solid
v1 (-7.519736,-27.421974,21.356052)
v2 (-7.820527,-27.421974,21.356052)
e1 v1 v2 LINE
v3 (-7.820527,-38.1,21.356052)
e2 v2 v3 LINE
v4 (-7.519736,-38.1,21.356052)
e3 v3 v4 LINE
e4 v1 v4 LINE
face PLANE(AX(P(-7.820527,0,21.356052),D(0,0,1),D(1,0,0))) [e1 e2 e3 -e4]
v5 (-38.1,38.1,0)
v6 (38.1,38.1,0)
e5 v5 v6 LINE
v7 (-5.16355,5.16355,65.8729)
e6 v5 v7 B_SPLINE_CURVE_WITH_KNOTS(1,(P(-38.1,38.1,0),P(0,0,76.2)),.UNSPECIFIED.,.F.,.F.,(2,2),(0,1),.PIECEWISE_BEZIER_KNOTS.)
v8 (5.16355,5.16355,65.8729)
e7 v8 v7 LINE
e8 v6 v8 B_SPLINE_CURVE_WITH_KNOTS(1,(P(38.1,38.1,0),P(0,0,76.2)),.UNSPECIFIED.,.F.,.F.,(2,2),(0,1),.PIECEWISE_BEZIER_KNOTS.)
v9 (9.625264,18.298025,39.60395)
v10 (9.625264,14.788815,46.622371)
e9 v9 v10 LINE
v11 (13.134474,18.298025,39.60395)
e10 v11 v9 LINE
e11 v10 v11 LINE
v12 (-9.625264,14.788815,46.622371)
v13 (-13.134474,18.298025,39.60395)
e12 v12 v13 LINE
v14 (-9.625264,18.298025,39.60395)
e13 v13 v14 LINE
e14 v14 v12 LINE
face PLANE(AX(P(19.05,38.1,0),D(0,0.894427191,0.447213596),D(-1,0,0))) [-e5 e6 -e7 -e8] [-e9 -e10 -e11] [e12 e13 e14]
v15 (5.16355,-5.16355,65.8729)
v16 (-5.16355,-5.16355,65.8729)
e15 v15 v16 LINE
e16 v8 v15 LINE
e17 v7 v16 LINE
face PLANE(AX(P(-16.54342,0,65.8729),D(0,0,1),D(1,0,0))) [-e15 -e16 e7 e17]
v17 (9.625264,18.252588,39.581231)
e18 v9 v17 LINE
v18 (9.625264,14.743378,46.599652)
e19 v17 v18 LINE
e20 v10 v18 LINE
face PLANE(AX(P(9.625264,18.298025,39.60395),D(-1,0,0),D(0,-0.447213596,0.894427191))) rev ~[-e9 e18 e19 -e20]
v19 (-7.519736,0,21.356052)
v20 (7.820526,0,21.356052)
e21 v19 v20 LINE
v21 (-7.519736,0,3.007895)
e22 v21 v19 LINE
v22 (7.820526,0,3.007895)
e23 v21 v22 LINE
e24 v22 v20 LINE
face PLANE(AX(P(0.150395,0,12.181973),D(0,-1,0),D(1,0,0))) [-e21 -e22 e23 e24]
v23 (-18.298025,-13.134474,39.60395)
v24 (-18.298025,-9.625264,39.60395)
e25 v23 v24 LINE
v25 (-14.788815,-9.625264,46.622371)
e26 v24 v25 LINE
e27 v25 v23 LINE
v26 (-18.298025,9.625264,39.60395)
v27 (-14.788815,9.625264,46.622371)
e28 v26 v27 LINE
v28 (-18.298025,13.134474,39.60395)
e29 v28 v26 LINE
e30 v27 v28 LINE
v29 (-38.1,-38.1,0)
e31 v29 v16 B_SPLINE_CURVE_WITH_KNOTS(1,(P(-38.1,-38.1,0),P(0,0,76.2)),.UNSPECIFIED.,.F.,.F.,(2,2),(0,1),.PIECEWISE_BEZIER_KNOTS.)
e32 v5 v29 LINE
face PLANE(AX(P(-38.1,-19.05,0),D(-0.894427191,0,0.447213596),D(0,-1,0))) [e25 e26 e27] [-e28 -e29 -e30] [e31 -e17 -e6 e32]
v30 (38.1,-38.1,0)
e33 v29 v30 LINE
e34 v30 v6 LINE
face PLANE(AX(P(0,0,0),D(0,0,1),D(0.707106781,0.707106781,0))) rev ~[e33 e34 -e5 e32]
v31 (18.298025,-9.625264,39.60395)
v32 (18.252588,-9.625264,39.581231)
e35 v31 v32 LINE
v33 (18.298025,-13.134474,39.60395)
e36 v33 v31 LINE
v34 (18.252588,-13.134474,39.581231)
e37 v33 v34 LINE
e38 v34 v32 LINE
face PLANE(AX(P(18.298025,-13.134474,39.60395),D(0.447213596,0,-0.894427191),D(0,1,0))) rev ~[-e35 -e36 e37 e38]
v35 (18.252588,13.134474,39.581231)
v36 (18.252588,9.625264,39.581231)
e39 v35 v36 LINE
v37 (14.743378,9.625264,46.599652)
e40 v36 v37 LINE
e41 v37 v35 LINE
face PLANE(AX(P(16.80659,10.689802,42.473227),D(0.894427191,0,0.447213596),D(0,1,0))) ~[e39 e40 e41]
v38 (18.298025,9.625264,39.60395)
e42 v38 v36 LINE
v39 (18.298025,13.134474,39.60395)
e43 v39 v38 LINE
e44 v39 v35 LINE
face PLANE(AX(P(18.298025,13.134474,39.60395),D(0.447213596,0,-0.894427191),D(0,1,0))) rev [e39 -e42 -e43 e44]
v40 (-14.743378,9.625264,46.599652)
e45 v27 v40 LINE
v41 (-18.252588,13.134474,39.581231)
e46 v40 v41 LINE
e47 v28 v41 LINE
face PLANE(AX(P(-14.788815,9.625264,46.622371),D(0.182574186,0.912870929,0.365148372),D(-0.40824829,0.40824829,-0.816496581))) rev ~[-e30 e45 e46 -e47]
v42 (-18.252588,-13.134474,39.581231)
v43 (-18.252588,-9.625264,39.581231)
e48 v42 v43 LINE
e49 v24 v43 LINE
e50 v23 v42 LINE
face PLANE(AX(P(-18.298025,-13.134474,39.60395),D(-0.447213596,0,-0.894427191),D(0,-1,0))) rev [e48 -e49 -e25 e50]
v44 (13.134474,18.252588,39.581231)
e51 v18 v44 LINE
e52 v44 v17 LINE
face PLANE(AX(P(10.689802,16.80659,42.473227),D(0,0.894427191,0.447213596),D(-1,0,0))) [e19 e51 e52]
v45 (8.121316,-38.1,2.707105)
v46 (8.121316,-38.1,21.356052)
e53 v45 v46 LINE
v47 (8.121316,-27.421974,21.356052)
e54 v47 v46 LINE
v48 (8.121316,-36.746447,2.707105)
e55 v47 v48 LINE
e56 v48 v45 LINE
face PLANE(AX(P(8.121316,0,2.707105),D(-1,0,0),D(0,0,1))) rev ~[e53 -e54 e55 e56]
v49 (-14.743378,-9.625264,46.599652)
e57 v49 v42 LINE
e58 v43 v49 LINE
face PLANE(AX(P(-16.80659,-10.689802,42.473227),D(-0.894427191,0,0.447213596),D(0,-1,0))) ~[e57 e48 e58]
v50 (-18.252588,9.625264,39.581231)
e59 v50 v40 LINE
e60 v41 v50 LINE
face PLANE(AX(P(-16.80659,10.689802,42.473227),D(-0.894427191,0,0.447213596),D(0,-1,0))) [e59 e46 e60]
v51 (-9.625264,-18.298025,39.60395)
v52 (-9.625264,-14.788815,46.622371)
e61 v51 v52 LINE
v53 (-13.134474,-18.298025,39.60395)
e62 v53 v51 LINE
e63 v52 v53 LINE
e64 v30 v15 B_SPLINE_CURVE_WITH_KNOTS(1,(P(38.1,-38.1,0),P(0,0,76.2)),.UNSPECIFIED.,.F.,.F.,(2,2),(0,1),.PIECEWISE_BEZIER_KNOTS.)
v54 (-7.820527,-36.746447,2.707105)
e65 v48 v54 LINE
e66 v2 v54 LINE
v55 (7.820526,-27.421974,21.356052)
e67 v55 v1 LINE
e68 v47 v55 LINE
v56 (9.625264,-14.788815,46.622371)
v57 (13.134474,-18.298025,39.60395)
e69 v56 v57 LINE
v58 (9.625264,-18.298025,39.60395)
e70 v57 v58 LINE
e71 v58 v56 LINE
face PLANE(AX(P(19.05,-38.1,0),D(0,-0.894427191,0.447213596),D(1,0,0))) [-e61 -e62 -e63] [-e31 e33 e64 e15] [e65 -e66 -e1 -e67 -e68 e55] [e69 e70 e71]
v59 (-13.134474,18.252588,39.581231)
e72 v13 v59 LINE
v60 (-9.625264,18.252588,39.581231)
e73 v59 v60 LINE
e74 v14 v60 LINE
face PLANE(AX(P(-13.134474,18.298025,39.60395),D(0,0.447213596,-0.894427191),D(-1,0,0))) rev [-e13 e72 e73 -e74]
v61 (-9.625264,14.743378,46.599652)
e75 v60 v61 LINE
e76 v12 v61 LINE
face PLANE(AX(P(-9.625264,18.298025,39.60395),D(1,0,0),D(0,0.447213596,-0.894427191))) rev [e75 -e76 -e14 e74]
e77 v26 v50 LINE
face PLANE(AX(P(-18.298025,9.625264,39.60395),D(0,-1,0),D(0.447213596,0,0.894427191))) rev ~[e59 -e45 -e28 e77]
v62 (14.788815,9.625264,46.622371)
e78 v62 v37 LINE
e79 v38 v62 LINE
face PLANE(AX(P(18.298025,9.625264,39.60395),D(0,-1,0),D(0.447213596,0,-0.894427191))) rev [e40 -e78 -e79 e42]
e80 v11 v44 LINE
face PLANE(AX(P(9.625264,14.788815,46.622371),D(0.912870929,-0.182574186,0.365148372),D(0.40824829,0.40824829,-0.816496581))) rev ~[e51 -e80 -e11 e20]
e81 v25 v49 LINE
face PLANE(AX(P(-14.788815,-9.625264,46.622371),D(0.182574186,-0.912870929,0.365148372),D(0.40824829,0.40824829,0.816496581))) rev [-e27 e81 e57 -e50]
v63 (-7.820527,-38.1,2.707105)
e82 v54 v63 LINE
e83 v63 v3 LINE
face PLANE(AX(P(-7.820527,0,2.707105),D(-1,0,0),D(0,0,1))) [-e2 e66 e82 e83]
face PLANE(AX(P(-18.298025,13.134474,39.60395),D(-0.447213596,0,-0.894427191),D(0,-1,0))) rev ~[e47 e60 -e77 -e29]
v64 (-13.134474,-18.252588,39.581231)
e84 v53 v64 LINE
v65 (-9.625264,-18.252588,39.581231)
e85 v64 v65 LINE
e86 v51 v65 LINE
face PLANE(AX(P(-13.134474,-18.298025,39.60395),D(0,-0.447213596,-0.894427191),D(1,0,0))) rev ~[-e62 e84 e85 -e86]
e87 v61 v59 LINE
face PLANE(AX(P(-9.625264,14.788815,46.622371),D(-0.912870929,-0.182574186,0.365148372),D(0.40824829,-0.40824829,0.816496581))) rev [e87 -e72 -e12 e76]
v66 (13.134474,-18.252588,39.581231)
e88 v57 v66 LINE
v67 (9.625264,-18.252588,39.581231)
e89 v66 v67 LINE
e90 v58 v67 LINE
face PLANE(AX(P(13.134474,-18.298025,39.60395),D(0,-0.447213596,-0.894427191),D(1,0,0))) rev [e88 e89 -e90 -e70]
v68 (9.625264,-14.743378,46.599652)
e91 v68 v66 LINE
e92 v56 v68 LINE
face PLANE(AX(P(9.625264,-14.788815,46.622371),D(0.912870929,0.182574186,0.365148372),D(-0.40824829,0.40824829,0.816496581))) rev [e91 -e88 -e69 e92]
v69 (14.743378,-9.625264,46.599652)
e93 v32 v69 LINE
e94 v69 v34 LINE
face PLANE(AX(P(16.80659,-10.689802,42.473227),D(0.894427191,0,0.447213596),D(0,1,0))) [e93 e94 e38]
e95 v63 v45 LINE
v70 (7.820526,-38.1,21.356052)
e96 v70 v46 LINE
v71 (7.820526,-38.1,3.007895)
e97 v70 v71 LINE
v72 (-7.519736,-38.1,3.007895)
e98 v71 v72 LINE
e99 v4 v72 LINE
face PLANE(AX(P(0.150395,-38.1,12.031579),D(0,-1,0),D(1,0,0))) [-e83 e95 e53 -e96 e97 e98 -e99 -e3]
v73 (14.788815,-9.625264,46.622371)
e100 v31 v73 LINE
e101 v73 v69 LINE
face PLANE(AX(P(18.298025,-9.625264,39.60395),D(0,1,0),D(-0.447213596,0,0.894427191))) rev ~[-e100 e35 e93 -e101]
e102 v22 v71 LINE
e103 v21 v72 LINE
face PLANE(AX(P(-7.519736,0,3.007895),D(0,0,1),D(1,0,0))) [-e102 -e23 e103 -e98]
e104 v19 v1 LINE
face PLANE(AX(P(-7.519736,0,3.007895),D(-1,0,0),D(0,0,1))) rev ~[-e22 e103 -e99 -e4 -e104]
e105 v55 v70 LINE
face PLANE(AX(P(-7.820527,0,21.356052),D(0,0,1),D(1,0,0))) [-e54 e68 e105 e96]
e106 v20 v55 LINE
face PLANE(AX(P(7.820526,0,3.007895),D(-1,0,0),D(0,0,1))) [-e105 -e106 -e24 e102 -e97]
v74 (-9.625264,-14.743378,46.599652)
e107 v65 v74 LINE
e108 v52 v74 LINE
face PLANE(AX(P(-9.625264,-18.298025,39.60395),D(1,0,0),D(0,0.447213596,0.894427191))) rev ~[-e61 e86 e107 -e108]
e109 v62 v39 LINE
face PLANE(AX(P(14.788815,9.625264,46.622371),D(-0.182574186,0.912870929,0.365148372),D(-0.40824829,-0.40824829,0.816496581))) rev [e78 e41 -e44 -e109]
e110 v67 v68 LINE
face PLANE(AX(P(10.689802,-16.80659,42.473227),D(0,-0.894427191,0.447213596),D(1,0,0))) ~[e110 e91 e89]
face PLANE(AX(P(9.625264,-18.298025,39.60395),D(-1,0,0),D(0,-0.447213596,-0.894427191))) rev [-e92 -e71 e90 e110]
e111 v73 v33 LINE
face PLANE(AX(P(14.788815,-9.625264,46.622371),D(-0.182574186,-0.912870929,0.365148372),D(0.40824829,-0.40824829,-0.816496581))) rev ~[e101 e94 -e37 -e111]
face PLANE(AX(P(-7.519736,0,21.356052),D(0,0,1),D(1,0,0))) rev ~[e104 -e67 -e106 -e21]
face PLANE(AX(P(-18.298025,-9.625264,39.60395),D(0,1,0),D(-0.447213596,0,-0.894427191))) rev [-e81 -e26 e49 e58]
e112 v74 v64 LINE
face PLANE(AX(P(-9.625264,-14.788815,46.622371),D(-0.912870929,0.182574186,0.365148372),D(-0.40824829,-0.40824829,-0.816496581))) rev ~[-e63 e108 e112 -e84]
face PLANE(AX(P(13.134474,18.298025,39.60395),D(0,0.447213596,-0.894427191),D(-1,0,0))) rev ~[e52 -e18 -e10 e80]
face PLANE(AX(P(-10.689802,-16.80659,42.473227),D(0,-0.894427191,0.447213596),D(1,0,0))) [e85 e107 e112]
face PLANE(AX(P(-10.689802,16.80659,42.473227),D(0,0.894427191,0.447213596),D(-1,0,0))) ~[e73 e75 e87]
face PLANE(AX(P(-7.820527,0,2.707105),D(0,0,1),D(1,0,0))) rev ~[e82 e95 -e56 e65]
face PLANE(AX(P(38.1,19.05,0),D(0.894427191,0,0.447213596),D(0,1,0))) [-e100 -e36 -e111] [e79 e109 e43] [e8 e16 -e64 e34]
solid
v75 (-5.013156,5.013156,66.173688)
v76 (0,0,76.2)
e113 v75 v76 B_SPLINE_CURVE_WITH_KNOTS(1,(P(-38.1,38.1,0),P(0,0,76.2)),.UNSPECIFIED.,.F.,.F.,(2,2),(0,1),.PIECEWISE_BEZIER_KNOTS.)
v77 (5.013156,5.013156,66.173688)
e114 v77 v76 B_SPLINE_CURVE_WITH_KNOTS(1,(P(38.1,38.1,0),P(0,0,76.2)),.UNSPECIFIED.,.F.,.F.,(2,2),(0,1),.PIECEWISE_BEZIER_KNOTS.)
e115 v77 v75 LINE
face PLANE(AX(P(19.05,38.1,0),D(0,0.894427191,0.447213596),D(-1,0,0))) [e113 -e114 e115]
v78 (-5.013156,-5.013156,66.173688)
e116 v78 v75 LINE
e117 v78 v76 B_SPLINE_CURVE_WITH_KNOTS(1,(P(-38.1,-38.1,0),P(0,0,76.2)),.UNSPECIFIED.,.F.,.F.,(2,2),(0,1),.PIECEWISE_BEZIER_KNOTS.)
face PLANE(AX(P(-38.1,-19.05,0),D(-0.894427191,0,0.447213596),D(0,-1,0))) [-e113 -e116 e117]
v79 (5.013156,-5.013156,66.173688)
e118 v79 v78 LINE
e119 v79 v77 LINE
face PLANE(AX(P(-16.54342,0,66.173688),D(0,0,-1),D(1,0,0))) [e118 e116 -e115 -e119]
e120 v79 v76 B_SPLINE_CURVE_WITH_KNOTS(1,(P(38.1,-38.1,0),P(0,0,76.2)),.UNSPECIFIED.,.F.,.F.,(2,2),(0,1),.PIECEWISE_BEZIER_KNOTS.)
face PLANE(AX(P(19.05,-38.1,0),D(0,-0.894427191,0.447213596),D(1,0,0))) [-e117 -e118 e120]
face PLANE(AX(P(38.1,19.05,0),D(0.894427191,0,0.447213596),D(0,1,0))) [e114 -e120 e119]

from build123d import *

# Parameters (mm, degrees)
F0_W             = 75.7989510894
F0_H             = 76.0997384787
F1_DEPTH         = 76.2
F2_W             = 94.859868288
F2_H             = 5.5733323097
F3_DEPTH         = 81.28
F5_DEPTH         = 81.28
F7_W             = 38.1
F7_H             = 38.1
F14_W            = 33.9892096817
F14_H            = 0.3007873893
F15_DEPTH        = 254
F15_DEPTH_BACK   = 127
F17_DEPTH        = 0.0508
F17_COPIES_COUNT = 4
F19_W            = 15.9418433905
F19_H            = 18.6489464249
F20_DEPTH        = 38.1
F21_W            = 15.3402625583
F21_H            = 18.348157173
F22_DEPTH        = 101.6


# Not quite as in the source:
# - a pattern or mirror of a feature is missing from the dataset's text; its kind, count and spacing are read off the source's solid


with BuildPart() as f1:
    # F0 (on Front) → F1 (new body)
    with BuildSketch(Plane.XZ):
        with Locations((37.8994755447, -38.0498692393)):
            Rectangle(F0_W, F0_H)
    extrude(amount=F1_DEPTH)

    # F2 (on face) → F3 (cut)
    with BuildSketch(Plane.XZ.offset(76.2)):
        with Locations((-47.429934144, -78.8864046335)):
            Rectangle(F2_W, F2_H)
        Polygon((0, 0), (0, -76.0997384787), (37.8994755447, 0), align=None)
    extrude(amount=-F3_DEPTH, mode=Mode.SUBTRACT)

    # F4 (on face) → F5 (cut)
    with BuildSketch(Plane.XZ.offset(76.2)):
        Polygon((75.7989510894, 0), (37.8994755447, 0), (75.7989510894, -76.0997384787), align=None)
    extrude(amount=-F5_DEPTH, mode=Mode.SUBTRACT)


with BuildPart() as f10:
    # F7 (on Top) → F10 section 0
    with BuildSketch(Plane.XY, mode=Mode.PRIVATE) as f10_s0:
        with Locations((-19.05, 19.05)):
            Rectangle(F7_W, F7_H)
    loft([f10_s0.sketch, Vertex(0, 0, 76.2)])

    # F7 (on Top) → F11 section 0
    with BuildSketch(Plane.XY, mode=Mode.PRIVATE) as f11_s0:
        with Locations((-19.05, -19.05)):
            Rectangle(F7_W, F7_H)
    loft([f11_s0.sketch, Vertex(0, 0, 76.2)])

    # F7 (on Top) → F12 section 0
    with BuildSketch(Plane.XY, mode=Mode.PRIVATE) as f12_s0:
        with Locations((19.05, -19.05)):
            Rectangle(F7_W, F7_H)
    loft([f12_s0.sketch, Vertex(0, 0, 76.2)])

    # F7 (on Top) → F13 section 0
    with BuildSketch(Plane.XY, mode=Mode.PRIVATE) as f13_s0:
        with Locations((19.05, 19.05)):
            Rectangle(F7_W, F7_H)
    loft([f13_s0.sketch, Vertex(0, 0, 76.2)])

    # F14 (on Front) → F15 (cut, two sides)
    with BuildSketch(Plane.XZ) as f15_sk:
        with Locations((0.4511848092, 66.0232938826)):
            Rectangle(F14_W, F14_H)
    extrude(amount=-F15_DEPTH, mode=Mode.SUBTRACT)
    extrude(f15_sk.sketch, amount=F15_DEPTH_BACK, mode=Mode.SUBTRACT)

    # F16 (on face) → F17 (cut)
    with BuildSketch(Plane(origin=(30.48, 0, 15.24), x_dir=(0, 1, 0), z_dir=(0.894427191, 0, 0.4472135955))):
        Polygon((-9.6252635121, 27.2397237785), (-9.6252635121, 35.0865572691), (-13.1344741307, 27.2397237785), align=None)
    f17 = extrude(amount=-F17_DEPTH, mode=Mode.SUBTRACT)

    # F17_copies: F17 ×4 about axis
    f17_copies_axis = Axis((0, 0, 0), (0, 0, 1))
    for i in range(1, F17_COPIES_COUNT):
        add(f17.rotate(f17_copies_axis, i * 360 / F17_COPIES_COUNT), mode=Mode.SUBTRACT)

    # F17_copies1: F17 across plane
    add(f17.mirror(Plane(origin=(0, 0, 0), x_dir=(-0.7071067812, -0.7071067812, 0), z_dir=(-0.7071067812, 0.7071067812, 0))), mode=Mode.SUBTRACT)

    # F17_copies2: F17 across plane
    add(f17.mirror(Plane(origin=(0, 0, 0), x_dir=(0, 0, -1), z_dir=(-1, 0, 0))), mode=Mode.SUBTRACT)

    # F17_copies3: F17 across plane
    add(f17.mirror(Plane(origin=(0, 0, 0), x_dir=(0.7071067812, -0.7071067812, 0), z_dir=(-0.7071067812, -0.7071067812, 0))), mode=Mode.SUBTRACT)

    # F17_copies4: F17 across plane
    add(f17.mirror(Plane.ZX), mode=Mode.SUBTRACT)

    # F19 (on Front) → F20 (join)
    with BuildSketch(Plane.XZ):
        with Locations((0.150394626, 12.0315785753)):
            Rectangle(F19_W, F19_H)
    extrude(amount=F20_DEPTH)

    # F21 (on Front) → F22 (cut)
    with BuildSketch(Plane.XZ):
        with Locations((0.1503948588, 12.1819732012)):
            Rectangle(F21_W, F21_H)
    extrude(amount=F22_DEPTH, mode=Mode.SUBTRACT)


solid = f10.part
